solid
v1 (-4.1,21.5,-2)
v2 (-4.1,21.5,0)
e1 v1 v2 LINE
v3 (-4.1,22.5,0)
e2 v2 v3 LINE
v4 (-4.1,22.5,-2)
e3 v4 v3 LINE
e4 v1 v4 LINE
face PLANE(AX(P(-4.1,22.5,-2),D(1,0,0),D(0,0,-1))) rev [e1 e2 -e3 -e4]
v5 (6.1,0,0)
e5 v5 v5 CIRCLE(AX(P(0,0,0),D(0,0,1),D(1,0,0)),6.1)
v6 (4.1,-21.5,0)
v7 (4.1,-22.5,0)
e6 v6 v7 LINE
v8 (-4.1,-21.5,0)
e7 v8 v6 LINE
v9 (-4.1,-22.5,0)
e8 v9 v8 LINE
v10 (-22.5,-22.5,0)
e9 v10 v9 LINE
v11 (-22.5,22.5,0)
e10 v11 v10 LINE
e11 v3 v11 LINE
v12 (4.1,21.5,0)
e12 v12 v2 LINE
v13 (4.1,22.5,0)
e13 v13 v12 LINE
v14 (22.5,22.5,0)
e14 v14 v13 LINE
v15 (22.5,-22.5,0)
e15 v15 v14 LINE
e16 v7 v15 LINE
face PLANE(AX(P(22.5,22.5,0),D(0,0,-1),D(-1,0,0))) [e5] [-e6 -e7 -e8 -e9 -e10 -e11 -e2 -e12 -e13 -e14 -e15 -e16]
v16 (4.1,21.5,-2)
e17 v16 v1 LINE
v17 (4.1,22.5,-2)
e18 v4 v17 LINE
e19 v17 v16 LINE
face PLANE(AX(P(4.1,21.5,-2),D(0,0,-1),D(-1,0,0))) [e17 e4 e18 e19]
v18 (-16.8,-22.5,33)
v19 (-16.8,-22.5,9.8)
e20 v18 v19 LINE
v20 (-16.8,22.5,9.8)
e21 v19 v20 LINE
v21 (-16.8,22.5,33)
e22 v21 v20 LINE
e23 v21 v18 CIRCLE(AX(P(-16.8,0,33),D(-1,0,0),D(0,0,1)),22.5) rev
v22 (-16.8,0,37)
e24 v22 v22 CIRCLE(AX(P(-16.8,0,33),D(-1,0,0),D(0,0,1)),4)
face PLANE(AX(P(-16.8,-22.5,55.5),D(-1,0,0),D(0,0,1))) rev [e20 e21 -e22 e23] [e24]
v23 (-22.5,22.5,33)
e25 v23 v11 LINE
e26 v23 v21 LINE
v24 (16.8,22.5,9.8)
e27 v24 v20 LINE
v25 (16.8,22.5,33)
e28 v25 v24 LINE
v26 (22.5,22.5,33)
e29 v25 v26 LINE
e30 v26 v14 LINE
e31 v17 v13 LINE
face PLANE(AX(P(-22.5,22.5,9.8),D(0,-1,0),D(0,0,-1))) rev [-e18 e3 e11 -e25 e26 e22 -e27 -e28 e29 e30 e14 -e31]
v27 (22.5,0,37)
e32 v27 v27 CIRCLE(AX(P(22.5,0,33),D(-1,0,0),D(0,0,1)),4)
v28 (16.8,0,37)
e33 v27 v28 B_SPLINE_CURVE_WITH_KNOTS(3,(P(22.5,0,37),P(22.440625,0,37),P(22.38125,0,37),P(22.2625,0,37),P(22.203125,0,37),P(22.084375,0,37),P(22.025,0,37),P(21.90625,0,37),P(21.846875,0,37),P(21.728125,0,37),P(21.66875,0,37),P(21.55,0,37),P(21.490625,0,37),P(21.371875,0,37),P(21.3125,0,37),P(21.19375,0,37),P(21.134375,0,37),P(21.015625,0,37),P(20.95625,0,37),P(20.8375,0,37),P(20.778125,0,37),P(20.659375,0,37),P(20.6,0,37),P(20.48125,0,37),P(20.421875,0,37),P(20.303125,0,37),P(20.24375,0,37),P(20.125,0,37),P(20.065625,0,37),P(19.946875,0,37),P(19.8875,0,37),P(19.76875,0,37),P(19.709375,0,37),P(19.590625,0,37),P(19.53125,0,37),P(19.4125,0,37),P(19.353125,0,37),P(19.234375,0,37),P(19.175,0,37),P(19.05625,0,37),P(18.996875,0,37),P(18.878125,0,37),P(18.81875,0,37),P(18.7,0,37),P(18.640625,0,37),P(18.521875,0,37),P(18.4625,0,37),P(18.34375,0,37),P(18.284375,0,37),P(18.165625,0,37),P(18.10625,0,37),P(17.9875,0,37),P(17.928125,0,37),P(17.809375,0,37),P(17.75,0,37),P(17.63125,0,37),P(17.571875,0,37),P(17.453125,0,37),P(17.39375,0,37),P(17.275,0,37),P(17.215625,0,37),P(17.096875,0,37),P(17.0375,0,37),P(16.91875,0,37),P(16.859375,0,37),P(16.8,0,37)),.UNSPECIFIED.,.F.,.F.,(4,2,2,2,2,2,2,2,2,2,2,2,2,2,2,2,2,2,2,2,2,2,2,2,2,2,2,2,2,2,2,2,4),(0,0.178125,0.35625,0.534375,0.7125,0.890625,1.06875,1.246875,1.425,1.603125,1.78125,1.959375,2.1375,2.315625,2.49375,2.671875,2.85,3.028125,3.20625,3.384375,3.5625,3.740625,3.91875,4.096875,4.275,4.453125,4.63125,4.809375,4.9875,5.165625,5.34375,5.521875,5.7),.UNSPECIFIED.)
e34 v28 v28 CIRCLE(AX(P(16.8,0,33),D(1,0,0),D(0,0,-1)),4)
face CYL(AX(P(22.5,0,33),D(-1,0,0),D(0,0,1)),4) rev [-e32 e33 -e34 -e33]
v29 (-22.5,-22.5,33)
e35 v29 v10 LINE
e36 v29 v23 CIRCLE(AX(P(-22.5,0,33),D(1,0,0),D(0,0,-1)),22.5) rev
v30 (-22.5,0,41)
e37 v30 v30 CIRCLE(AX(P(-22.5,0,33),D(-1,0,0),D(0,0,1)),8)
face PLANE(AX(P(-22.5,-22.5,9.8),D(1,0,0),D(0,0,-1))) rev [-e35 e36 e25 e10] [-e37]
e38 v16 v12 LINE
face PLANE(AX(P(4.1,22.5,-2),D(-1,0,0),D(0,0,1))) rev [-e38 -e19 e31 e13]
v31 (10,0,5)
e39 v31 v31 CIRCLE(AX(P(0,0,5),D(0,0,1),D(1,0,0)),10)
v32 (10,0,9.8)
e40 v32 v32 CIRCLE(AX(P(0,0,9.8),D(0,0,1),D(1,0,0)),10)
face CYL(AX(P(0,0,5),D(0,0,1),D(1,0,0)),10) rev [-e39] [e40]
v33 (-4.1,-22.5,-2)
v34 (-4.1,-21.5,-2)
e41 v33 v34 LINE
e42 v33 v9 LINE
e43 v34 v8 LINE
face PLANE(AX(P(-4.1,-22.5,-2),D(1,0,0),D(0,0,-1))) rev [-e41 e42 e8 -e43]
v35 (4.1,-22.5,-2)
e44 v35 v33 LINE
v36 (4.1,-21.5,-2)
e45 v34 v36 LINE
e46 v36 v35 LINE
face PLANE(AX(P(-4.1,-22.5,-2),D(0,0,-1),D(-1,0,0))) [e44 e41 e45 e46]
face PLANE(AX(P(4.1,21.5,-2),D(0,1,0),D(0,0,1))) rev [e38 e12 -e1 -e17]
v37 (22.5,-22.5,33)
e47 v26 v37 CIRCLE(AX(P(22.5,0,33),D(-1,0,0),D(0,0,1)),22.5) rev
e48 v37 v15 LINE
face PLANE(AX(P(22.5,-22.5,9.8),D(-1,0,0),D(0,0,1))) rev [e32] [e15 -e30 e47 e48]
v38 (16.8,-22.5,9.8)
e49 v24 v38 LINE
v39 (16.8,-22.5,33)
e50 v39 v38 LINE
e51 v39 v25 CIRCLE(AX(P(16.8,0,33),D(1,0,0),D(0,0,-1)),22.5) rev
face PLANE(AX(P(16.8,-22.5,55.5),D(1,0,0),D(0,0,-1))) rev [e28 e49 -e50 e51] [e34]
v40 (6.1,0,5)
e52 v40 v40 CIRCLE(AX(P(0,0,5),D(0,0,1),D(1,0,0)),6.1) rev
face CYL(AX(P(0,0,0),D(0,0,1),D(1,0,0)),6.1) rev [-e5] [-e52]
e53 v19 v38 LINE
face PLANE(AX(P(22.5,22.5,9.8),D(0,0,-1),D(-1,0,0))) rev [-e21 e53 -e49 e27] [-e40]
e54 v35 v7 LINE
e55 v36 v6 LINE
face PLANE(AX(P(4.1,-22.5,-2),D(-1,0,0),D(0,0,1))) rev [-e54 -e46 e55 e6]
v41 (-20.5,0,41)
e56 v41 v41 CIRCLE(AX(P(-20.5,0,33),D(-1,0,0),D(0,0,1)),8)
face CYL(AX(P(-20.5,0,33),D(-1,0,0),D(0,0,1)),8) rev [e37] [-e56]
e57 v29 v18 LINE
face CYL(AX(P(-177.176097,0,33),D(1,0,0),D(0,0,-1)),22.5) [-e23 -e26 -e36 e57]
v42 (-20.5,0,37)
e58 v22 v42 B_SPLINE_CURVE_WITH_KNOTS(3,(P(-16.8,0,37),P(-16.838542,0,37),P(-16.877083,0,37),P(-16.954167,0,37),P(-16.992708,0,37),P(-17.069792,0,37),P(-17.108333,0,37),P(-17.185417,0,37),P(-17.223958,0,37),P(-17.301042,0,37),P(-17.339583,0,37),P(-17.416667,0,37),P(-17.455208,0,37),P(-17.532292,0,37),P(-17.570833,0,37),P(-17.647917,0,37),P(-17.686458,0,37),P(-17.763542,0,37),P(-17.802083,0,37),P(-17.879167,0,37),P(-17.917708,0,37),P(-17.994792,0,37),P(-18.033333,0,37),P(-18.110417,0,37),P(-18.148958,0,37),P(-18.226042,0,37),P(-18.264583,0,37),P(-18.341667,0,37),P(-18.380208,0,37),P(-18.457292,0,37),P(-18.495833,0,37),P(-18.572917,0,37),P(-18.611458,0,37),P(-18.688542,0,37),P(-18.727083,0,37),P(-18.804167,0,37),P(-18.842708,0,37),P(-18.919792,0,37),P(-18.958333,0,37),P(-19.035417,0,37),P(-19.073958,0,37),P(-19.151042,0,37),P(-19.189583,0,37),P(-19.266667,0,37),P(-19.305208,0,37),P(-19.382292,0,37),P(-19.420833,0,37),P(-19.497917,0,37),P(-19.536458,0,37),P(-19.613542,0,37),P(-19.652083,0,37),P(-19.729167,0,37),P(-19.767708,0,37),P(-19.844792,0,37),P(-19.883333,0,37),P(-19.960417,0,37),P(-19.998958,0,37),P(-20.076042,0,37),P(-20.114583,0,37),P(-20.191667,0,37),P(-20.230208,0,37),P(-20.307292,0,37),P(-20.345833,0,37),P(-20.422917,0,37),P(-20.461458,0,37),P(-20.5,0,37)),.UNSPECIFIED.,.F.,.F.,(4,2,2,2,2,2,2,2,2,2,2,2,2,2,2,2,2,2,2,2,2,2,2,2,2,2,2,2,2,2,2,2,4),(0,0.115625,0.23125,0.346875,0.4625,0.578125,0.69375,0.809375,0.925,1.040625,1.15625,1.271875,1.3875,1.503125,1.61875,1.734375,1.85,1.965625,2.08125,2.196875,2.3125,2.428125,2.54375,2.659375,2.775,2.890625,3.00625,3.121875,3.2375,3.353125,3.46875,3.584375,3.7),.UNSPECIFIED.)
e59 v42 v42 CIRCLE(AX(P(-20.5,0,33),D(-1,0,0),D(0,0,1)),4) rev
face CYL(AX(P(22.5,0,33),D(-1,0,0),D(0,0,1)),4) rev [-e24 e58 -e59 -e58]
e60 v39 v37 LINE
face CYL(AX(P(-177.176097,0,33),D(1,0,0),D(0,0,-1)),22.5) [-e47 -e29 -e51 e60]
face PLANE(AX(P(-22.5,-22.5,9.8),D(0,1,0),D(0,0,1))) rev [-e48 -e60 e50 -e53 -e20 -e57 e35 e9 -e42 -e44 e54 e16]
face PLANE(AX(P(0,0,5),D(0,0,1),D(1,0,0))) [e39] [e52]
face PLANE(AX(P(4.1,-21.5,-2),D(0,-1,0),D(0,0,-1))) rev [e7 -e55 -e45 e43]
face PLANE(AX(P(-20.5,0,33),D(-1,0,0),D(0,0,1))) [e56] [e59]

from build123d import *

# Parameters (mm, degrees)
SKETCH_1_W          = 45
SKETCH_1_H          = 45
EXTRUDE_1_DEPTH     = 9.8
SKETCH_2_W          = 5.7
SKETCH_2_H          = 45
EXTRUDE_2_DEPTH     = 45.7
CUT_EXTRUDE_START   = -45
CUT_EXTRUDE_2_DEPTH = 45
SKETCH_4_R          = 4
CUT_EXTRUDE_3_DEPTH = 75.909945935
SKETCH_5_R          = 8
CUT_EXTRUDE_4_DEPTH = 2
SKETCH_6_R          = 6.1
CUT_EXTRUDE_5_DEPTH = 56.686533381
SKETCH_7_W          = 8.2
SKETCH_7_H          = 1
EXTRUDE_3_DEPTH     = 2
SKETCH_8_R          = 10
CUT_EXTRUDE_6_DEPTH = 4.8


# Read off the part's stored shape, not the designer's step: 切除-拉伸2
with BuildPart() as part:
    # 草图1 → 凸台-拉伸1 (new body)
    with BuildSketch(Plane.XY):
        Rectangle(SKETCH_1_W, SKETCH_1_H)
    extrude(amount=EXTRUDE_1_DEPTH)

    # 草图2 → 凸台-拉伸2 (add)
    with BuildSketch(Plane.XY.offset(9.8)):
        with Locations((-19.65, 0)):
            Rectangle(SKETCH_2_W, SKETCH_2_H)
        with Locations((19.65, 0)):
            Rectangle(SKETCH_2_W, SKETCH_2_H)
    extrude(amount=EXTRUDE_2_DEPTH)

    # 切除-拉伸2 outline → 切除-拉伸2 (cut)
    with BuildSketch(Plane.ZY.offset(22.5).offset(CUT_EXTRUDE_START)):
        with BuildLine():
            Line((55.5, 22.5), (33, 22.5))
            ThreePointArc((33, 22.5), (48.909902577, 15.909902577), (55.5, 0))
            Line((55.5, 0), (55.5, 22.5))
        make_face()
        with BuildLine():
            Line((55.5, -22.5), (55.5, 0))
            ThreePointArc((55.5, 0), (48.909902577, -15.909902577), (33, -22.5))
            Line((33, -22.5), (55.5, -22.5))
        make_face()
    extrude(amount=CUT_EXTRUDE_2_DEPTH, mode=Mode.SUBTRACT)

    # 草图4 → 切除-拉伸3 (cut, through all)
    with BuildSketch(Plane.ZY.offset(22.5)):
        with Locations((33, 0)):
            Circle(SKETCH_4_R)
    extrude(amount=-CUT_EXTRUDE_3_DEPTH, mode=Mode.SUBTRACT)

    # 草图5 → 切除-拉伸4 (cut)
    with BuildSketch(Plane.ZY.offset(22.5)):
        with Locations((33, 0)):
            Circle(SKETCH_5_R)
    extrude(amount=-CUT_EXTRUDE_4_DEPTH, mode=Mode.SUBTRACT)

    # 草图6 → 切除-拉伸5 (cut, through all)
    with BuildSketch(Plane.XY.offset(9.8)):
        Circle(SKETCH_6_R)
    extrude(amount=-CUT_EXTRUDE_5_DEPTH, mode=Mode.SUBTRACT)

    # 草图7 → 凸台-拉伸3 (add)
    with BuildSketch(Plane(origin=(0, 0, 0), x_dir=(-1, 0, 0), z_dir=(0, 0, -1))):
        with Locations((0, 22)):
            Rectangle(SKETCH_7_W, SKETCH_7_H)
        with Locations((0, -22)):
            Rectangle(SKETCH_7_W, SKETCH_7_H)
    extrude(amount=EXTRUDE_3_DEPTH)

    # 草图8 → 切除-拉伸6 (cut)
    with BuildSketch(Plane.XY.offset(9.8)):
        Circle(SKETCH_8_R)
    extrude(amount=-CUT_EXTRUDE_6_DEPTH, mode=Mode.SUBTRACT)


solid = part.part
